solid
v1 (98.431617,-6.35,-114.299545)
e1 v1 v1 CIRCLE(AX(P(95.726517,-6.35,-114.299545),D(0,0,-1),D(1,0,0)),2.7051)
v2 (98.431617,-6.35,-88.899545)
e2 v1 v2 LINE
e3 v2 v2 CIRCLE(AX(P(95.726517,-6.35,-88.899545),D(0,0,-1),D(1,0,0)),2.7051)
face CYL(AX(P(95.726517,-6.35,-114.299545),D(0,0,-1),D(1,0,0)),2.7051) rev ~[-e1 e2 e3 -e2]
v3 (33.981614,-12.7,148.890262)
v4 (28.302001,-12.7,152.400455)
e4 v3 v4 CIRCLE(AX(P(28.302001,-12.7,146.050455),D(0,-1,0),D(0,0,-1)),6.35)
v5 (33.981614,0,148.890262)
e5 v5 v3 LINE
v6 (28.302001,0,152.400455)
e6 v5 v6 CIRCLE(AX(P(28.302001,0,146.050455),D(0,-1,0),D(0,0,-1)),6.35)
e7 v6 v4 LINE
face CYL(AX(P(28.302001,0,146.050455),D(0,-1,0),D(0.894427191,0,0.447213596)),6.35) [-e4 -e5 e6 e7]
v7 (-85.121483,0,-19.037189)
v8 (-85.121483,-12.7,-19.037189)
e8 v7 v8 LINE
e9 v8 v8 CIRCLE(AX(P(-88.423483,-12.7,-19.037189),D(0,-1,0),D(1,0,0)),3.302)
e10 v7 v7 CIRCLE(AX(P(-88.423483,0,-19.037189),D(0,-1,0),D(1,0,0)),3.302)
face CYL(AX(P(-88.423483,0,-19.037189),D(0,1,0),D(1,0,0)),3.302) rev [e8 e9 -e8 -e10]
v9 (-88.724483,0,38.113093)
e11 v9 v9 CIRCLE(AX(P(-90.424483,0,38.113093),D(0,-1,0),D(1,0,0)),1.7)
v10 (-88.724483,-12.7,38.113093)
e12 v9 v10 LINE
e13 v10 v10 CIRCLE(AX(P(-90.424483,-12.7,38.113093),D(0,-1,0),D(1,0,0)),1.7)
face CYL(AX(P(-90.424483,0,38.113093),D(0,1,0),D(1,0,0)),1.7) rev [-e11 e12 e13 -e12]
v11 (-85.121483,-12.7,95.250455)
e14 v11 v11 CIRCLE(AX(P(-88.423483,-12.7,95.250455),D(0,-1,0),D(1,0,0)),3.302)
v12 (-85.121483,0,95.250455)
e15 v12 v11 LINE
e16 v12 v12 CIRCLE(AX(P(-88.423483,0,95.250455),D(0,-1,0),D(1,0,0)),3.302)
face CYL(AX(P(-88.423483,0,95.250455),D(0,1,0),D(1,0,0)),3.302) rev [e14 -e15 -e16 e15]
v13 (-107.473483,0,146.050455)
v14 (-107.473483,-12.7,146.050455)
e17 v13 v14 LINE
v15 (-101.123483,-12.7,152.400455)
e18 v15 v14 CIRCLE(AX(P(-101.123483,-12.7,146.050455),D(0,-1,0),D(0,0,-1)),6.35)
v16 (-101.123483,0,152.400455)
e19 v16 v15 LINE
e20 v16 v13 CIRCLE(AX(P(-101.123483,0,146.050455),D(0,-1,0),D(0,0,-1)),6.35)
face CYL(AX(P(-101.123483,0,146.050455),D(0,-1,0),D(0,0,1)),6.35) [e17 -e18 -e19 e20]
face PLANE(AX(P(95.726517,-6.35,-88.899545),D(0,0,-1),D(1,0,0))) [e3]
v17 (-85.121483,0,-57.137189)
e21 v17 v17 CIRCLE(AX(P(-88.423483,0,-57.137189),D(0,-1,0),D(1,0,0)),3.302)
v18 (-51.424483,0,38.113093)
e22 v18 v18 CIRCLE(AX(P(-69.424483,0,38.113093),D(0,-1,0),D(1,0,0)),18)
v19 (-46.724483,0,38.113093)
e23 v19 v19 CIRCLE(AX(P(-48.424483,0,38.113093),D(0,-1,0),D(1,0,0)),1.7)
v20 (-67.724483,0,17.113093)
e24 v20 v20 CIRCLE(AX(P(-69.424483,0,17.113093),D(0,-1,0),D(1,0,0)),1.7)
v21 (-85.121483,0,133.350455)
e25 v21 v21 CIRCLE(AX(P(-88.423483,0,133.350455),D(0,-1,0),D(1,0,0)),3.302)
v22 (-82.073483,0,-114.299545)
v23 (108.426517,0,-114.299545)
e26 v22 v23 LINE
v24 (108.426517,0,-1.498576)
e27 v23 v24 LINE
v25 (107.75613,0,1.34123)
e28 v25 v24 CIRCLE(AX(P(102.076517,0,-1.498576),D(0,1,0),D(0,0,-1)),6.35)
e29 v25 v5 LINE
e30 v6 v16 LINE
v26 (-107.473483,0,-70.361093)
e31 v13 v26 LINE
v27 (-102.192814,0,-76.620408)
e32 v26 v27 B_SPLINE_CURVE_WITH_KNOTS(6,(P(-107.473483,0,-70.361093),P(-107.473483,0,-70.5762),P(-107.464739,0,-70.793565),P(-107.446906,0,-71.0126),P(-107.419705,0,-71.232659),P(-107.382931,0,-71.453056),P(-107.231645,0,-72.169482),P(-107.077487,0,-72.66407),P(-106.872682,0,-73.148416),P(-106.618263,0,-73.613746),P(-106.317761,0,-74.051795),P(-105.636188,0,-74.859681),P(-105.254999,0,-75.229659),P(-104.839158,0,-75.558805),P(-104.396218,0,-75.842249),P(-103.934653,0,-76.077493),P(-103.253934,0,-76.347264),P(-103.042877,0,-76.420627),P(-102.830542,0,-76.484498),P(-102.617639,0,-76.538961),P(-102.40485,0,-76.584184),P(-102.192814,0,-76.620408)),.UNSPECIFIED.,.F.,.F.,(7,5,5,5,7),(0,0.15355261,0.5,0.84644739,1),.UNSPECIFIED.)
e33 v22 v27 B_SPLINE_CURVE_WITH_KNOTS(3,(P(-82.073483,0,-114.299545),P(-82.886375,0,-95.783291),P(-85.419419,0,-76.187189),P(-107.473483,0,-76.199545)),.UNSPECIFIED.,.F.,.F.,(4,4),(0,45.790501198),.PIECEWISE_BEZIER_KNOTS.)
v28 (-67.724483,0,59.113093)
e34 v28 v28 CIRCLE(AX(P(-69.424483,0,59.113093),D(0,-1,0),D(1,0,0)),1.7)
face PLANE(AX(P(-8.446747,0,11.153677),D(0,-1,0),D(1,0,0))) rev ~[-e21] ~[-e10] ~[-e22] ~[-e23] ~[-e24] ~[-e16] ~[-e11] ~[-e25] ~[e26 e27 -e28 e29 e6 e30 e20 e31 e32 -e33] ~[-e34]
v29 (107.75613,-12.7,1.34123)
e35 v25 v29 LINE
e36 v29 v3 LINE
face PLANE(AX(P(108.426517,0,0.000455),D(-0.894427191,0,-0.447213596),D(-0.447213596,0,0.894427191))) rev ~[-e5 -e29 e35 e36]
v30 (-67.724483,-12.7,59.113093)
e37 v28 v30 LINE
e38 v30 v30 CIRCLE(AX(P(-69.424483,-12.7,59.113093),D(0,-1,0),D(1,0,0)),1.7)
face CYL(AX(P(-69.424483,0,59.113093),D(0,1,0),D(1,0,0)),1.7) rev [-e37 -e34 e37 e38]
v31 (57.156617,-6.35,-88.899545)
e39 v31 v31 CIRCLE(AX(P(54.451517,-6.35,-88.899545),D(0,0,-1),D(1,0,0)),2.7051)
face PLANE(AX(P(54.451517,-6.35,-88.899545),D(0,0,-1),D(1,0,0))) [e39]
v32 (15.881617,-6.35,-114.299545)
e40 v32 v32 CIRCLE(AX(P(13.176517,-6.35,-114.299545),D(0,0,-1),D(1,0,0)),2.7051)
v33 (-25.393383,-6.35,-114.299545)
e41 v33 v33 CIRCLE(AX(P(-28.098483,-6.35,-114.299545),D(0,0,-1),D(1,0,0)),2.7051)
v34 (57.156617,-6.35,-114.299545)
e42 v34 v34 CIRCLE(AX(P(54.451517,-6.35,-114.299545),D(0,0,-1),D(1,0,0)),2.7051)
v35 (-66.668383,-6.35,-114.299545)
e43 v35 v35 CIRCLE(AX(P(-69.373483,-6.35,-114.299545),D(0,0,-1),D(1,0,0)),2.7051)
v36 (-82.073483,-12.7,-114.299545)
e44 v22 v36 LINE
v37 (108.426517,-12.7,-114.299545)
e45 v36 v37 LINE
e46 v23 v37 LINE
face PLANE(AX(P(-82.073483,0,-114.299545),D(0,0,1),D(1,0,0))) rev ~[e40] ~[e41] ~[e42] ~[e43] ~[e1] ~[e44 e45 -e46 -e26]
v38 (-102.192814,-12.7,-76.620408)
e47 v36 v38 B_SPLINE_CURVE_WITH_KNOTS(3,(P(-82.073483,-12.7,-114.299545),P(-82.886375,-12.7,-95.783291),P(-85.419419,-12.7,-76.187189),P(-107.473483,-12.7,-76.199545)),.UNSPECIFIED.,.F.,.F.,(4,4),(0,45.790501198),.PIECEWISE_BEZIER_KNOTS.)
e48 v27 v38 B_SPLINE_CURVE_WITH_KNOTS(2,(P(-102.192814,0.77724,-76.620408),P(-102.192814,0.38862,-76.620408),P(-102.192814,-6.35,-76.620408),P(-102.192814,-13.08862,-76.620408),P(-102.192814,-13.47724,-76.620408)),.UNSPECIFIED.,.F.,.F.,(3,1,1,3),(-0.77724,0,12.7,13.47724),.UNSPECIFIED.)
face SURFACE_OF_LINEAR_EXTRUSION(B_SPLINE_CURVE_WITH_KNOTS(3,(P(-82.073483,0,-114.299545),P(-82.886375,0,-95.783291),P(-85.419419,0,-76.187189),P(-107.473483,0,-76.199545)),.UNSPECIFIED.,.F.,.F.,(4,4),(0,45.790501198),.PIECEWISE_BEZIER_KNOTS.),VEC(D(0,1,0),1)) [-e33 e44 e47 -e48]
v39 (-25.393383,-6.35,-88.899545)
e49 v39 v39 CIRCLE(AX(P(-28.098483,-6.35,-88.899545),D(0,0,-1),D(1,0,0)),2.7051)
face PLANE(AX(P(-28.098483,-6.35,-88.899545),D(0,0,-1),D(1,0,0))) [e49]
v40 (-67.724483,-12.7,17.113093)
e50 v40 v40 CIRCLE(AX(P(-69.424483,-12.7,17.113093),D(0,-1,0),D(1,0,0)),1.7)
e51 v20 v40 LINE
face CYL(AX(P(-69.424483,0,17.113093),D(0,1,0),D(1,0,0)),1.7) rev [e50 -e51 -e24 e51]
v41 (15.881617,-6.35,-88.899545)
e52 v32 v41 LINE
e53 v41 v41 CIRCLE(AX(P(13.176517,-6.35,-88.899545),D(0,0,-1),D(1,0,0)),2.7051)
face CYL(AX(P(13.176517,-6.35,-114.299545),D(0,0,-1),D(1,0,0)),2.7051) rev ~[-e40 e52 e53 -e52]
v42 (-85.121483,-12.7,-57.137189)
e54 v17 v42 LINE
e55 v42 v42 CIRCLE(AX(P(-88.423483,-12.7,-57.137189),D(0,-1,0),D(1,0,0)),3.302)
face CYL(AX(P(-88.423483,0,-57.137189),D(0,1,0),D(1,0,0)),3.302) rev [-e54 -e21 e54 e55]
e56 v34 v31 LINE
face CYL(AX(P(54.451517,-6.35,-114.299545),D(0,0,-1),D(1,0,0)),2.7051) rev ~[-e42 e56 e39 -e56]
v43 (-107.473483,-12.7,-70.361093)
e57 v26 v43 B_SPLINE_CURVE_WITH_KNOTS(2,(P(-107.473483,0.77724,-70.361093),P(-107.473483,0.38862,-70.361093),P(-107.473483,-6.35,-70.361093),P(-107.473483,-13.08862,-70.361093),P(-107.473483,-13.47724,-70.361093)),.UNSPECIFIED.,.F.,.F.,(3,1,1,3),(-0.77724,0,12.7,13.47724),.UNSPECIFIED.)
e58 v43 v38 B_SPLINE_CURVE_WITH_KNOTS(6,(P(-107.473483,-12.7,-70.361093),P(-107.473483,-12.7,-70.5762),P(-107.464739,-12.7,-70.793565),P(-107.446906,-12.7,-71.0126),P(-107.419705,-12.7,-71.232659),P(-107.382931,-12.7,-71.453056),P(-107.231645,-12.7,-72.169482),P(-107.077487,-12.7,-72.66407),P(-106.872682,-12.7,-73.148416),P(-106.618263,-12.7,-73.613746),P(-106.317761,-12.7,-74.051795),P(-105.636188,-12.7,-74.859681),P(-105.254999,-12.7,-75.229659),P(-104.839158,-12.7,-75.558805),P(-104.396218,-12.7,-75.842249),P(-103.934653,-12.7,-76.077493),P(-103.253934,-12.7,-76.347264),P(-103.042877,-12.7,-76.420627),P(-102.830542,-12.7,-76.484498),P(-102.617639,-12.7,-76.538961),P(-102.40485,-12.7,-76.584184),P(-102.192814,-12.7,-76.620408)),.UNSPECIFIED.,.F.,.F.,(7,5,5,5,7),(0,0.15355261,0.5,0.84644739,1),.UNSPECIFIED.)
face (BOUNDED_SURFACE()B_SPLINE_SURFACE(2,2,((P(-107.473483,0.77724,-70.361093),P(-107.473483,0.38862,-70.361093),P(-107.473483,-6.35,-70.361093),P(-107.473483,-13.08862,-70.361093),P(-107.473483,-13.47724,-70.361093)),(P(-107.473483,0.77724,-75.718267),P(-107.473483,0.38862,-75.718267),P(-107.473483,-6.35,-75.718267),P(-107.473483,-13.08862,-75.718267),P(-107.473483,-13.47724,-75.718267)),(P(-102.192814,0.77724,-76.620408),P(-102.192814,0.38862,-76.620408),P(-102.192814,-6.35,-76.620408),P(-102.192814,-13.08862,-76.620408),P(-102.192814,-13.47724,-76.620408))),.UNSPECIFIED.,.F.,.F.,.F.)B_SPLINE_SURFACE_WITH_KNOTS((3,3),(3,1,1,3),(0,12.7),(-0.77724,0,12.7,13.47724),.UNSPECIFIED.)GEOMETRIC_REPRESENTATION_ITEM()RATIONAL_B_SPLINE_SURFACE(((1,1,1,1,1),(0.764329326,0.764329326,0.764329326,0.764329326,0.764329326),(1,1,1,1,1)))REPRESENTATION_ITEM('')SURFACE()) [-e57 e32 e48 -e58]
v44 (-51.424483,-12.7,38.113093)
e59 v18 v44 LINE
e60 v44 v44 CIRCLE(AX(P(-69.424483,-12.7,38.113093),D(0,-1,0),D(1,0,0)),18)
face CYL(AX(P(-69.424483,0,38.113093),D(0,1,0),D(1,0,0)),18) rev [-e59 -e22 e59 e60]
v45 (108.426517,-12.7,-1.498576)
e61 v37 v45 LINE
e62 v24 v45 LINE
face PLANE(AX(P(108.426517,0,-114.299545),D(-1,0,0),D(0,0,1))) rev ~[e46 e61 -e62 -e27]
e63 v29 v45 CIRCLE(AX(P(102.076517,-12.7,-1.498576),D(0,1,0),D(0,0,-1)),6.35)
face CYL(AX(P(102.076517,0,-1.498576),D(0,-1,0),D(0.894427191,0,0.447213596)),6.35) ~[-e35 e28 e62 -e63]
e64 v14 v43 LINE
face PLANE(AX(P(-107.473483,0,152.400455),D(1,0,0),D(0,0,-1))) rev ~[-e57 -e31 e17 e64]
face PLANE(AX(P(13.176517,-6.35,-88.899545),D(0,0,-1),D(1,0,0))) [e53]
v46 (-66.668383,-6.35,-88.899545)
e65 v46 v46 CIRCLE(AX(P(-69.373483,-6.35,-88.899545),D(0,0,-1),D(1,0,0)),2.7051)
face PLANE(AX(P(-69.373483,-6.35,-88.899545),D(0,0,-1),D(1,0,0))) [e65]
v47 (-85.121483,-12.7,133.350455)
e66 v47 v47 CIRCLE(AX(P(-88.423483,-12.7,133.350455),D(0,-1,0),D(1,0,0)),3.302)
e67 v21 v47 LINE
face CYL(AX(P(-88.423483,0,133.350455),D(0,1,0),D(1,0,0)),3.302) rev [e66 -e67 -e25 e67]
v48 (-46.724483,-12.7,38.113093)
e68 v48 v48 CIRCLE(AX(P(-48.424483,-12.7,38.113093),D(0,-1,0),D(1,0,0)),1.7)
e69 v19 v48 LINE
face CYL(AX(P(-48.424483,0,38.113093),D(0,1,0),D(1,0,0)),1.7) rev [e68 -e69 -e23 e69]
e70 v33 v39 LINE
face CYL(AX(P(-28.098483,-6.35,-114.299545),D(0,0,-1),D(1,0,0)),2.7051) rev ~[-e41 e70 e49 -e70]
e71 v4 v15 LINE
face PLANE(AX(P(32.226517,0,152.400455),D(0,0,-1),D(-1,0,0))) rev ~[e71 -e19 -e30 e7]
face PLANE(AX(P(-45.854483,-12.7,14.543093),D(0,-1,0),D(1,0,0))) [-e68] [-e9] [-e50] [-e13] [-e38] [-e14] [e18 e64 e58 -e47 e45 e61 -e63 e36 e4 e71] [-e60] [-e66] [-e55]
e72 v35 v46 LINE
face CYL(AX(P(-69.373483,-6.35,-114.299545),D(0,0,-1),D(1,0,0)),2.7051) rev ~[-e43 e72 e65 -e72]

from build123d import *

# Parameters (mm, degrees)
F0_R     = 3.302
F0_R_2   = 1.7
F0_R_3   = 18
F1_DEPTH = 12.7
F2_DEPTH = 25.4
F4_R     = 6.35
F3_R     = 1.7
F5_DEPTH = 12.7
F6_R     = 2.7051
F7_DEPTH = 25.4


# Not quite as in the source:
# - a feature names something its author has since deleted; it is built from what else it names


with BuildPart() as f1:
    # F0 (on Front) → F1 (new body)
    with BuildSketch(Plane.XZ):
        with BuildLine():
            Line((108.4265169831, 0.0004552842), (32.2265169831, 152.4004552842))
            Line((32.2265169831, 152.4004552842), (-107.4734830169, 152.4004552842))
            Line((-107.4734830169, 152.4004552842), (-107.4734830169, -76.1995447158))
            add(Edge.make_bspline(
                [(-82.0734830169, -114.2995447158), (-82.8863746009, -95.7832909802), (-85.4194185281, -76.1871889735), (-107.4734830169, -76.1995447158)],
                knots=[0, 0, 0, 0, 45.7905011984, 45.7905011984, 45.7905011984, 45.7905011984], degree=3))
            Line((-82.0734830169, -114.2995447158), (108.4265169831, -114.2995447158))
            Line((108.4265169831, -114.2995447158), (108.4265169831, 0.0004552842))
        make_face()
        with Locations((-88.4234830169, -57.1371889735)):
            Circle(F0_R, mode=Mode.SUBTRACT)
        with Locations((-88.4234830169, -19.0371889735)):
            Circle(F0_R, mode=Mode.SUBTRACT)
        with Locations((-92.9944827628, 14.5430932346)):
            Circle(F0_R_2, mode=Mode.SUBTRACT)
        with Locations((-69.4244827628, 17.1130932346)):
            Circle(F0_R_2, mode=Mode.SUBTRACT)
        with Locations((-45.8544827628, 14.5430932346)):
            Circle(F0_R_2, mode=Mode.SUBTRACT)
        with Locations((-90.4244827628, 38.1130932346)):
            Circle(F0_R_2, mode=Mode.SUBTRACT)
        with Locations((-69.4244827628, 38.1130932346)):
            Circle(F0_R_3, mode=Mode.SUBTRACT)
        with Locations((-92.9944827628, 61.6830932346)):
            Circle(F0_R_2, mode=Mode.SUBTRACT)
        with Locations((-69.4244827628, 59.1130932346)):
            Circle(F0_R_2, mode=Mode.SUBTRACT)
        with Locations((-48.4244827628, 38.1130932346)):
            Circle(F0_R_2, mode=Mode.SUBTRACT)
        with Locations((-45.8544827628, 61.6830932346)):
            Circle(F0_R_2, mode=Mode.SUBTRACT)
        with Locations((-88.4234830169, 95.2504552842)):
            Circle(F0_R, mode=Mode.SUBTRACT)
        with Locations((-88.4234830169, 133.3504552842)):
            Circle(F0_R, mode=Mode.SUBTRACT)
        with Locations((-92.9944827628, 14.5430932346)):
            Circle(F0_R_2)
        with Locations((-45.8544827628, 61.6830932346)):
            Circle(F0_R_2)
    extrude(amount=F1_DEPTH)

    # F0 (on Front) → F2 (cut)
    with BuildSketch(Plane.XZ):
        with BuildLine():
            add(Edge.make_bspline(
                [(-82.0734830169, -114.2995447158), (-82.8863746009, -95.7832909802), (-85.4194185281, -76.1871889735), (-107.4734830169, -76.1995447158)],
                knots=[0, 0, 0, 0, 45.7905011984, 45.7905011984, 45.7905011984, 45.7905011984], degree=3))
            Line((-107.4734830169, -76.1995447158), (-107.4734830169, -114.2995447158))
            Line((-107.4734830169, -114.2995447158), (-82.0734830169, -114.2995447158))
        make_face()
        with BuildLine():
            Line((108.4265169831, 0.0004552842), (32.2265169831, 152.4004552842))
            Line((32.2265169831, 152.4004552842), (-107.4734830169, 152.4004552842))
            Line((-107.4734830169, 152.4004552842), (-107.4734830169, -76.1995447158))
            add(Edge.make_bspline(
                [(-82.0734830169, -114.2995447158), (-82.8863746009, -95.7832909802), (-85.4194185281, -76.1871889735), (-107.4734830169, -76.1995447158)],
                knots=[0, 0, 0, 0, 45.7905011984, 45.7905011984, 45.7905011984, 45.7905011984], degree=3))
            Line((-82.0734830169, -114.2995447158), (108.4265169831, -114.2995447158))
            Line((108.4265169831, -114.2995447158), (108.4265169831, 0.0004552842))
        make_face()
        with Locations((-88.4234830169, -57.1371889735)):
            Circle(F0_R, mode=Mode.SUBTRACT)
        with Locations((-88.4234830169, -19.0371889735)):
            Circle(F0_R, mode=Mode.SUBTRACT)
        with Locations((-92.9944827628, 14.5430932346)):
            Circle(F0_R_2, mode=Mode.SUBTRACT)
        with Locations((-69.4244827628, 17.1130932346)):
            Circle(F0_R_2, mode=Mode.SUBTRACT)
        with Locations((-45.8544827628, 14.5430932346)):
            Circle(F0_R_2, mode=Mode.SUBTRACT)
        with Locations((-90.4244827628, 38.1130932346)):
            Circle(F0_R_2, mode=Mode.SUBTRACT)
        with Locations((-69.4244827628, 38.1130932346)):
            Circle(F0_R_3, mode=Mode.SUBTRACT)
        with Locations((-92.9944827628, 61.6830932346)):
            Circle(F0_R_2, mode=Mode.SUBTRACT)
        with Locations((-69.4244827628, 59.1130932346)):
            Circle(F0_R_2, mode=Mode.SUBTRACT)
        with Locations((-48.4244827628, 38.1130932346)):
            Circle(F0_R_2, mode=Mode.SUBTRACT)
        with Locations((-45.8544827628, 61.6830932346)):
            Circle(F0_R_2, mode=Mode.SUBTRACT)
        with Locations((-88.4234830169, 95.2504552842)):
            Circle(F0_R, mode=Mode.SUBTRACT)
        with Locations((-88.4234830169, 133.3504552842)):
            Circle(F0_R, mode=Mode.SUBTRACT)
    extrude(amount=-F2_DEPTH, mode=Mode.SUBTRACT)

    # F4
    f4_edges = [f1.edges().sort_by_distance(p)[0] for p in [
        (-107.473483, -6.35, -76.199545),
        (-107.473483, -6.35, 152.400455),
        (108.426517, -6.35, 0.000455),
        (32.226517, -6.35, 152.400455),
    ]]
    fillet(f4_edges, radius=F4_R)

    # F3 (on face) → F5 (join)
    with BuildSketch(Plane.XZ.offset(12.7)):
        with Locations((-45.8544827628, 14.5430932346)):
            Circle(F3_R)
        with Locations((-92.9944827628, 61.6830932346)):
            Circle(F3_R)
    extrude(amount=-F5_DEPTH)

    # F6 (on face) → F7 (cut)
    with BuildSketch(Plane(origin=(0, 0, -114.2995447158), x_dir=(1, 0, 0), z_dir=(0, 0, -1))):
        with Locations((-69.3734830169, 6.35)):
            Circle(F6_R)
        with Locations((-28.0984830169, 6.35)):
            Circle(F6_R)
        with Locations((13.1765169831, 6.35)):
            Circle(F6_R)
        with Locations((54.4515169831, 6.35)):
            Circle(F6_R)
        with Locations((95.7265169831, 6.35)):
            Circle(F6_R)
    extrude(amount=-F7_DEPTH, mode=Mode.SUBTRACT)


solid = f1.part
